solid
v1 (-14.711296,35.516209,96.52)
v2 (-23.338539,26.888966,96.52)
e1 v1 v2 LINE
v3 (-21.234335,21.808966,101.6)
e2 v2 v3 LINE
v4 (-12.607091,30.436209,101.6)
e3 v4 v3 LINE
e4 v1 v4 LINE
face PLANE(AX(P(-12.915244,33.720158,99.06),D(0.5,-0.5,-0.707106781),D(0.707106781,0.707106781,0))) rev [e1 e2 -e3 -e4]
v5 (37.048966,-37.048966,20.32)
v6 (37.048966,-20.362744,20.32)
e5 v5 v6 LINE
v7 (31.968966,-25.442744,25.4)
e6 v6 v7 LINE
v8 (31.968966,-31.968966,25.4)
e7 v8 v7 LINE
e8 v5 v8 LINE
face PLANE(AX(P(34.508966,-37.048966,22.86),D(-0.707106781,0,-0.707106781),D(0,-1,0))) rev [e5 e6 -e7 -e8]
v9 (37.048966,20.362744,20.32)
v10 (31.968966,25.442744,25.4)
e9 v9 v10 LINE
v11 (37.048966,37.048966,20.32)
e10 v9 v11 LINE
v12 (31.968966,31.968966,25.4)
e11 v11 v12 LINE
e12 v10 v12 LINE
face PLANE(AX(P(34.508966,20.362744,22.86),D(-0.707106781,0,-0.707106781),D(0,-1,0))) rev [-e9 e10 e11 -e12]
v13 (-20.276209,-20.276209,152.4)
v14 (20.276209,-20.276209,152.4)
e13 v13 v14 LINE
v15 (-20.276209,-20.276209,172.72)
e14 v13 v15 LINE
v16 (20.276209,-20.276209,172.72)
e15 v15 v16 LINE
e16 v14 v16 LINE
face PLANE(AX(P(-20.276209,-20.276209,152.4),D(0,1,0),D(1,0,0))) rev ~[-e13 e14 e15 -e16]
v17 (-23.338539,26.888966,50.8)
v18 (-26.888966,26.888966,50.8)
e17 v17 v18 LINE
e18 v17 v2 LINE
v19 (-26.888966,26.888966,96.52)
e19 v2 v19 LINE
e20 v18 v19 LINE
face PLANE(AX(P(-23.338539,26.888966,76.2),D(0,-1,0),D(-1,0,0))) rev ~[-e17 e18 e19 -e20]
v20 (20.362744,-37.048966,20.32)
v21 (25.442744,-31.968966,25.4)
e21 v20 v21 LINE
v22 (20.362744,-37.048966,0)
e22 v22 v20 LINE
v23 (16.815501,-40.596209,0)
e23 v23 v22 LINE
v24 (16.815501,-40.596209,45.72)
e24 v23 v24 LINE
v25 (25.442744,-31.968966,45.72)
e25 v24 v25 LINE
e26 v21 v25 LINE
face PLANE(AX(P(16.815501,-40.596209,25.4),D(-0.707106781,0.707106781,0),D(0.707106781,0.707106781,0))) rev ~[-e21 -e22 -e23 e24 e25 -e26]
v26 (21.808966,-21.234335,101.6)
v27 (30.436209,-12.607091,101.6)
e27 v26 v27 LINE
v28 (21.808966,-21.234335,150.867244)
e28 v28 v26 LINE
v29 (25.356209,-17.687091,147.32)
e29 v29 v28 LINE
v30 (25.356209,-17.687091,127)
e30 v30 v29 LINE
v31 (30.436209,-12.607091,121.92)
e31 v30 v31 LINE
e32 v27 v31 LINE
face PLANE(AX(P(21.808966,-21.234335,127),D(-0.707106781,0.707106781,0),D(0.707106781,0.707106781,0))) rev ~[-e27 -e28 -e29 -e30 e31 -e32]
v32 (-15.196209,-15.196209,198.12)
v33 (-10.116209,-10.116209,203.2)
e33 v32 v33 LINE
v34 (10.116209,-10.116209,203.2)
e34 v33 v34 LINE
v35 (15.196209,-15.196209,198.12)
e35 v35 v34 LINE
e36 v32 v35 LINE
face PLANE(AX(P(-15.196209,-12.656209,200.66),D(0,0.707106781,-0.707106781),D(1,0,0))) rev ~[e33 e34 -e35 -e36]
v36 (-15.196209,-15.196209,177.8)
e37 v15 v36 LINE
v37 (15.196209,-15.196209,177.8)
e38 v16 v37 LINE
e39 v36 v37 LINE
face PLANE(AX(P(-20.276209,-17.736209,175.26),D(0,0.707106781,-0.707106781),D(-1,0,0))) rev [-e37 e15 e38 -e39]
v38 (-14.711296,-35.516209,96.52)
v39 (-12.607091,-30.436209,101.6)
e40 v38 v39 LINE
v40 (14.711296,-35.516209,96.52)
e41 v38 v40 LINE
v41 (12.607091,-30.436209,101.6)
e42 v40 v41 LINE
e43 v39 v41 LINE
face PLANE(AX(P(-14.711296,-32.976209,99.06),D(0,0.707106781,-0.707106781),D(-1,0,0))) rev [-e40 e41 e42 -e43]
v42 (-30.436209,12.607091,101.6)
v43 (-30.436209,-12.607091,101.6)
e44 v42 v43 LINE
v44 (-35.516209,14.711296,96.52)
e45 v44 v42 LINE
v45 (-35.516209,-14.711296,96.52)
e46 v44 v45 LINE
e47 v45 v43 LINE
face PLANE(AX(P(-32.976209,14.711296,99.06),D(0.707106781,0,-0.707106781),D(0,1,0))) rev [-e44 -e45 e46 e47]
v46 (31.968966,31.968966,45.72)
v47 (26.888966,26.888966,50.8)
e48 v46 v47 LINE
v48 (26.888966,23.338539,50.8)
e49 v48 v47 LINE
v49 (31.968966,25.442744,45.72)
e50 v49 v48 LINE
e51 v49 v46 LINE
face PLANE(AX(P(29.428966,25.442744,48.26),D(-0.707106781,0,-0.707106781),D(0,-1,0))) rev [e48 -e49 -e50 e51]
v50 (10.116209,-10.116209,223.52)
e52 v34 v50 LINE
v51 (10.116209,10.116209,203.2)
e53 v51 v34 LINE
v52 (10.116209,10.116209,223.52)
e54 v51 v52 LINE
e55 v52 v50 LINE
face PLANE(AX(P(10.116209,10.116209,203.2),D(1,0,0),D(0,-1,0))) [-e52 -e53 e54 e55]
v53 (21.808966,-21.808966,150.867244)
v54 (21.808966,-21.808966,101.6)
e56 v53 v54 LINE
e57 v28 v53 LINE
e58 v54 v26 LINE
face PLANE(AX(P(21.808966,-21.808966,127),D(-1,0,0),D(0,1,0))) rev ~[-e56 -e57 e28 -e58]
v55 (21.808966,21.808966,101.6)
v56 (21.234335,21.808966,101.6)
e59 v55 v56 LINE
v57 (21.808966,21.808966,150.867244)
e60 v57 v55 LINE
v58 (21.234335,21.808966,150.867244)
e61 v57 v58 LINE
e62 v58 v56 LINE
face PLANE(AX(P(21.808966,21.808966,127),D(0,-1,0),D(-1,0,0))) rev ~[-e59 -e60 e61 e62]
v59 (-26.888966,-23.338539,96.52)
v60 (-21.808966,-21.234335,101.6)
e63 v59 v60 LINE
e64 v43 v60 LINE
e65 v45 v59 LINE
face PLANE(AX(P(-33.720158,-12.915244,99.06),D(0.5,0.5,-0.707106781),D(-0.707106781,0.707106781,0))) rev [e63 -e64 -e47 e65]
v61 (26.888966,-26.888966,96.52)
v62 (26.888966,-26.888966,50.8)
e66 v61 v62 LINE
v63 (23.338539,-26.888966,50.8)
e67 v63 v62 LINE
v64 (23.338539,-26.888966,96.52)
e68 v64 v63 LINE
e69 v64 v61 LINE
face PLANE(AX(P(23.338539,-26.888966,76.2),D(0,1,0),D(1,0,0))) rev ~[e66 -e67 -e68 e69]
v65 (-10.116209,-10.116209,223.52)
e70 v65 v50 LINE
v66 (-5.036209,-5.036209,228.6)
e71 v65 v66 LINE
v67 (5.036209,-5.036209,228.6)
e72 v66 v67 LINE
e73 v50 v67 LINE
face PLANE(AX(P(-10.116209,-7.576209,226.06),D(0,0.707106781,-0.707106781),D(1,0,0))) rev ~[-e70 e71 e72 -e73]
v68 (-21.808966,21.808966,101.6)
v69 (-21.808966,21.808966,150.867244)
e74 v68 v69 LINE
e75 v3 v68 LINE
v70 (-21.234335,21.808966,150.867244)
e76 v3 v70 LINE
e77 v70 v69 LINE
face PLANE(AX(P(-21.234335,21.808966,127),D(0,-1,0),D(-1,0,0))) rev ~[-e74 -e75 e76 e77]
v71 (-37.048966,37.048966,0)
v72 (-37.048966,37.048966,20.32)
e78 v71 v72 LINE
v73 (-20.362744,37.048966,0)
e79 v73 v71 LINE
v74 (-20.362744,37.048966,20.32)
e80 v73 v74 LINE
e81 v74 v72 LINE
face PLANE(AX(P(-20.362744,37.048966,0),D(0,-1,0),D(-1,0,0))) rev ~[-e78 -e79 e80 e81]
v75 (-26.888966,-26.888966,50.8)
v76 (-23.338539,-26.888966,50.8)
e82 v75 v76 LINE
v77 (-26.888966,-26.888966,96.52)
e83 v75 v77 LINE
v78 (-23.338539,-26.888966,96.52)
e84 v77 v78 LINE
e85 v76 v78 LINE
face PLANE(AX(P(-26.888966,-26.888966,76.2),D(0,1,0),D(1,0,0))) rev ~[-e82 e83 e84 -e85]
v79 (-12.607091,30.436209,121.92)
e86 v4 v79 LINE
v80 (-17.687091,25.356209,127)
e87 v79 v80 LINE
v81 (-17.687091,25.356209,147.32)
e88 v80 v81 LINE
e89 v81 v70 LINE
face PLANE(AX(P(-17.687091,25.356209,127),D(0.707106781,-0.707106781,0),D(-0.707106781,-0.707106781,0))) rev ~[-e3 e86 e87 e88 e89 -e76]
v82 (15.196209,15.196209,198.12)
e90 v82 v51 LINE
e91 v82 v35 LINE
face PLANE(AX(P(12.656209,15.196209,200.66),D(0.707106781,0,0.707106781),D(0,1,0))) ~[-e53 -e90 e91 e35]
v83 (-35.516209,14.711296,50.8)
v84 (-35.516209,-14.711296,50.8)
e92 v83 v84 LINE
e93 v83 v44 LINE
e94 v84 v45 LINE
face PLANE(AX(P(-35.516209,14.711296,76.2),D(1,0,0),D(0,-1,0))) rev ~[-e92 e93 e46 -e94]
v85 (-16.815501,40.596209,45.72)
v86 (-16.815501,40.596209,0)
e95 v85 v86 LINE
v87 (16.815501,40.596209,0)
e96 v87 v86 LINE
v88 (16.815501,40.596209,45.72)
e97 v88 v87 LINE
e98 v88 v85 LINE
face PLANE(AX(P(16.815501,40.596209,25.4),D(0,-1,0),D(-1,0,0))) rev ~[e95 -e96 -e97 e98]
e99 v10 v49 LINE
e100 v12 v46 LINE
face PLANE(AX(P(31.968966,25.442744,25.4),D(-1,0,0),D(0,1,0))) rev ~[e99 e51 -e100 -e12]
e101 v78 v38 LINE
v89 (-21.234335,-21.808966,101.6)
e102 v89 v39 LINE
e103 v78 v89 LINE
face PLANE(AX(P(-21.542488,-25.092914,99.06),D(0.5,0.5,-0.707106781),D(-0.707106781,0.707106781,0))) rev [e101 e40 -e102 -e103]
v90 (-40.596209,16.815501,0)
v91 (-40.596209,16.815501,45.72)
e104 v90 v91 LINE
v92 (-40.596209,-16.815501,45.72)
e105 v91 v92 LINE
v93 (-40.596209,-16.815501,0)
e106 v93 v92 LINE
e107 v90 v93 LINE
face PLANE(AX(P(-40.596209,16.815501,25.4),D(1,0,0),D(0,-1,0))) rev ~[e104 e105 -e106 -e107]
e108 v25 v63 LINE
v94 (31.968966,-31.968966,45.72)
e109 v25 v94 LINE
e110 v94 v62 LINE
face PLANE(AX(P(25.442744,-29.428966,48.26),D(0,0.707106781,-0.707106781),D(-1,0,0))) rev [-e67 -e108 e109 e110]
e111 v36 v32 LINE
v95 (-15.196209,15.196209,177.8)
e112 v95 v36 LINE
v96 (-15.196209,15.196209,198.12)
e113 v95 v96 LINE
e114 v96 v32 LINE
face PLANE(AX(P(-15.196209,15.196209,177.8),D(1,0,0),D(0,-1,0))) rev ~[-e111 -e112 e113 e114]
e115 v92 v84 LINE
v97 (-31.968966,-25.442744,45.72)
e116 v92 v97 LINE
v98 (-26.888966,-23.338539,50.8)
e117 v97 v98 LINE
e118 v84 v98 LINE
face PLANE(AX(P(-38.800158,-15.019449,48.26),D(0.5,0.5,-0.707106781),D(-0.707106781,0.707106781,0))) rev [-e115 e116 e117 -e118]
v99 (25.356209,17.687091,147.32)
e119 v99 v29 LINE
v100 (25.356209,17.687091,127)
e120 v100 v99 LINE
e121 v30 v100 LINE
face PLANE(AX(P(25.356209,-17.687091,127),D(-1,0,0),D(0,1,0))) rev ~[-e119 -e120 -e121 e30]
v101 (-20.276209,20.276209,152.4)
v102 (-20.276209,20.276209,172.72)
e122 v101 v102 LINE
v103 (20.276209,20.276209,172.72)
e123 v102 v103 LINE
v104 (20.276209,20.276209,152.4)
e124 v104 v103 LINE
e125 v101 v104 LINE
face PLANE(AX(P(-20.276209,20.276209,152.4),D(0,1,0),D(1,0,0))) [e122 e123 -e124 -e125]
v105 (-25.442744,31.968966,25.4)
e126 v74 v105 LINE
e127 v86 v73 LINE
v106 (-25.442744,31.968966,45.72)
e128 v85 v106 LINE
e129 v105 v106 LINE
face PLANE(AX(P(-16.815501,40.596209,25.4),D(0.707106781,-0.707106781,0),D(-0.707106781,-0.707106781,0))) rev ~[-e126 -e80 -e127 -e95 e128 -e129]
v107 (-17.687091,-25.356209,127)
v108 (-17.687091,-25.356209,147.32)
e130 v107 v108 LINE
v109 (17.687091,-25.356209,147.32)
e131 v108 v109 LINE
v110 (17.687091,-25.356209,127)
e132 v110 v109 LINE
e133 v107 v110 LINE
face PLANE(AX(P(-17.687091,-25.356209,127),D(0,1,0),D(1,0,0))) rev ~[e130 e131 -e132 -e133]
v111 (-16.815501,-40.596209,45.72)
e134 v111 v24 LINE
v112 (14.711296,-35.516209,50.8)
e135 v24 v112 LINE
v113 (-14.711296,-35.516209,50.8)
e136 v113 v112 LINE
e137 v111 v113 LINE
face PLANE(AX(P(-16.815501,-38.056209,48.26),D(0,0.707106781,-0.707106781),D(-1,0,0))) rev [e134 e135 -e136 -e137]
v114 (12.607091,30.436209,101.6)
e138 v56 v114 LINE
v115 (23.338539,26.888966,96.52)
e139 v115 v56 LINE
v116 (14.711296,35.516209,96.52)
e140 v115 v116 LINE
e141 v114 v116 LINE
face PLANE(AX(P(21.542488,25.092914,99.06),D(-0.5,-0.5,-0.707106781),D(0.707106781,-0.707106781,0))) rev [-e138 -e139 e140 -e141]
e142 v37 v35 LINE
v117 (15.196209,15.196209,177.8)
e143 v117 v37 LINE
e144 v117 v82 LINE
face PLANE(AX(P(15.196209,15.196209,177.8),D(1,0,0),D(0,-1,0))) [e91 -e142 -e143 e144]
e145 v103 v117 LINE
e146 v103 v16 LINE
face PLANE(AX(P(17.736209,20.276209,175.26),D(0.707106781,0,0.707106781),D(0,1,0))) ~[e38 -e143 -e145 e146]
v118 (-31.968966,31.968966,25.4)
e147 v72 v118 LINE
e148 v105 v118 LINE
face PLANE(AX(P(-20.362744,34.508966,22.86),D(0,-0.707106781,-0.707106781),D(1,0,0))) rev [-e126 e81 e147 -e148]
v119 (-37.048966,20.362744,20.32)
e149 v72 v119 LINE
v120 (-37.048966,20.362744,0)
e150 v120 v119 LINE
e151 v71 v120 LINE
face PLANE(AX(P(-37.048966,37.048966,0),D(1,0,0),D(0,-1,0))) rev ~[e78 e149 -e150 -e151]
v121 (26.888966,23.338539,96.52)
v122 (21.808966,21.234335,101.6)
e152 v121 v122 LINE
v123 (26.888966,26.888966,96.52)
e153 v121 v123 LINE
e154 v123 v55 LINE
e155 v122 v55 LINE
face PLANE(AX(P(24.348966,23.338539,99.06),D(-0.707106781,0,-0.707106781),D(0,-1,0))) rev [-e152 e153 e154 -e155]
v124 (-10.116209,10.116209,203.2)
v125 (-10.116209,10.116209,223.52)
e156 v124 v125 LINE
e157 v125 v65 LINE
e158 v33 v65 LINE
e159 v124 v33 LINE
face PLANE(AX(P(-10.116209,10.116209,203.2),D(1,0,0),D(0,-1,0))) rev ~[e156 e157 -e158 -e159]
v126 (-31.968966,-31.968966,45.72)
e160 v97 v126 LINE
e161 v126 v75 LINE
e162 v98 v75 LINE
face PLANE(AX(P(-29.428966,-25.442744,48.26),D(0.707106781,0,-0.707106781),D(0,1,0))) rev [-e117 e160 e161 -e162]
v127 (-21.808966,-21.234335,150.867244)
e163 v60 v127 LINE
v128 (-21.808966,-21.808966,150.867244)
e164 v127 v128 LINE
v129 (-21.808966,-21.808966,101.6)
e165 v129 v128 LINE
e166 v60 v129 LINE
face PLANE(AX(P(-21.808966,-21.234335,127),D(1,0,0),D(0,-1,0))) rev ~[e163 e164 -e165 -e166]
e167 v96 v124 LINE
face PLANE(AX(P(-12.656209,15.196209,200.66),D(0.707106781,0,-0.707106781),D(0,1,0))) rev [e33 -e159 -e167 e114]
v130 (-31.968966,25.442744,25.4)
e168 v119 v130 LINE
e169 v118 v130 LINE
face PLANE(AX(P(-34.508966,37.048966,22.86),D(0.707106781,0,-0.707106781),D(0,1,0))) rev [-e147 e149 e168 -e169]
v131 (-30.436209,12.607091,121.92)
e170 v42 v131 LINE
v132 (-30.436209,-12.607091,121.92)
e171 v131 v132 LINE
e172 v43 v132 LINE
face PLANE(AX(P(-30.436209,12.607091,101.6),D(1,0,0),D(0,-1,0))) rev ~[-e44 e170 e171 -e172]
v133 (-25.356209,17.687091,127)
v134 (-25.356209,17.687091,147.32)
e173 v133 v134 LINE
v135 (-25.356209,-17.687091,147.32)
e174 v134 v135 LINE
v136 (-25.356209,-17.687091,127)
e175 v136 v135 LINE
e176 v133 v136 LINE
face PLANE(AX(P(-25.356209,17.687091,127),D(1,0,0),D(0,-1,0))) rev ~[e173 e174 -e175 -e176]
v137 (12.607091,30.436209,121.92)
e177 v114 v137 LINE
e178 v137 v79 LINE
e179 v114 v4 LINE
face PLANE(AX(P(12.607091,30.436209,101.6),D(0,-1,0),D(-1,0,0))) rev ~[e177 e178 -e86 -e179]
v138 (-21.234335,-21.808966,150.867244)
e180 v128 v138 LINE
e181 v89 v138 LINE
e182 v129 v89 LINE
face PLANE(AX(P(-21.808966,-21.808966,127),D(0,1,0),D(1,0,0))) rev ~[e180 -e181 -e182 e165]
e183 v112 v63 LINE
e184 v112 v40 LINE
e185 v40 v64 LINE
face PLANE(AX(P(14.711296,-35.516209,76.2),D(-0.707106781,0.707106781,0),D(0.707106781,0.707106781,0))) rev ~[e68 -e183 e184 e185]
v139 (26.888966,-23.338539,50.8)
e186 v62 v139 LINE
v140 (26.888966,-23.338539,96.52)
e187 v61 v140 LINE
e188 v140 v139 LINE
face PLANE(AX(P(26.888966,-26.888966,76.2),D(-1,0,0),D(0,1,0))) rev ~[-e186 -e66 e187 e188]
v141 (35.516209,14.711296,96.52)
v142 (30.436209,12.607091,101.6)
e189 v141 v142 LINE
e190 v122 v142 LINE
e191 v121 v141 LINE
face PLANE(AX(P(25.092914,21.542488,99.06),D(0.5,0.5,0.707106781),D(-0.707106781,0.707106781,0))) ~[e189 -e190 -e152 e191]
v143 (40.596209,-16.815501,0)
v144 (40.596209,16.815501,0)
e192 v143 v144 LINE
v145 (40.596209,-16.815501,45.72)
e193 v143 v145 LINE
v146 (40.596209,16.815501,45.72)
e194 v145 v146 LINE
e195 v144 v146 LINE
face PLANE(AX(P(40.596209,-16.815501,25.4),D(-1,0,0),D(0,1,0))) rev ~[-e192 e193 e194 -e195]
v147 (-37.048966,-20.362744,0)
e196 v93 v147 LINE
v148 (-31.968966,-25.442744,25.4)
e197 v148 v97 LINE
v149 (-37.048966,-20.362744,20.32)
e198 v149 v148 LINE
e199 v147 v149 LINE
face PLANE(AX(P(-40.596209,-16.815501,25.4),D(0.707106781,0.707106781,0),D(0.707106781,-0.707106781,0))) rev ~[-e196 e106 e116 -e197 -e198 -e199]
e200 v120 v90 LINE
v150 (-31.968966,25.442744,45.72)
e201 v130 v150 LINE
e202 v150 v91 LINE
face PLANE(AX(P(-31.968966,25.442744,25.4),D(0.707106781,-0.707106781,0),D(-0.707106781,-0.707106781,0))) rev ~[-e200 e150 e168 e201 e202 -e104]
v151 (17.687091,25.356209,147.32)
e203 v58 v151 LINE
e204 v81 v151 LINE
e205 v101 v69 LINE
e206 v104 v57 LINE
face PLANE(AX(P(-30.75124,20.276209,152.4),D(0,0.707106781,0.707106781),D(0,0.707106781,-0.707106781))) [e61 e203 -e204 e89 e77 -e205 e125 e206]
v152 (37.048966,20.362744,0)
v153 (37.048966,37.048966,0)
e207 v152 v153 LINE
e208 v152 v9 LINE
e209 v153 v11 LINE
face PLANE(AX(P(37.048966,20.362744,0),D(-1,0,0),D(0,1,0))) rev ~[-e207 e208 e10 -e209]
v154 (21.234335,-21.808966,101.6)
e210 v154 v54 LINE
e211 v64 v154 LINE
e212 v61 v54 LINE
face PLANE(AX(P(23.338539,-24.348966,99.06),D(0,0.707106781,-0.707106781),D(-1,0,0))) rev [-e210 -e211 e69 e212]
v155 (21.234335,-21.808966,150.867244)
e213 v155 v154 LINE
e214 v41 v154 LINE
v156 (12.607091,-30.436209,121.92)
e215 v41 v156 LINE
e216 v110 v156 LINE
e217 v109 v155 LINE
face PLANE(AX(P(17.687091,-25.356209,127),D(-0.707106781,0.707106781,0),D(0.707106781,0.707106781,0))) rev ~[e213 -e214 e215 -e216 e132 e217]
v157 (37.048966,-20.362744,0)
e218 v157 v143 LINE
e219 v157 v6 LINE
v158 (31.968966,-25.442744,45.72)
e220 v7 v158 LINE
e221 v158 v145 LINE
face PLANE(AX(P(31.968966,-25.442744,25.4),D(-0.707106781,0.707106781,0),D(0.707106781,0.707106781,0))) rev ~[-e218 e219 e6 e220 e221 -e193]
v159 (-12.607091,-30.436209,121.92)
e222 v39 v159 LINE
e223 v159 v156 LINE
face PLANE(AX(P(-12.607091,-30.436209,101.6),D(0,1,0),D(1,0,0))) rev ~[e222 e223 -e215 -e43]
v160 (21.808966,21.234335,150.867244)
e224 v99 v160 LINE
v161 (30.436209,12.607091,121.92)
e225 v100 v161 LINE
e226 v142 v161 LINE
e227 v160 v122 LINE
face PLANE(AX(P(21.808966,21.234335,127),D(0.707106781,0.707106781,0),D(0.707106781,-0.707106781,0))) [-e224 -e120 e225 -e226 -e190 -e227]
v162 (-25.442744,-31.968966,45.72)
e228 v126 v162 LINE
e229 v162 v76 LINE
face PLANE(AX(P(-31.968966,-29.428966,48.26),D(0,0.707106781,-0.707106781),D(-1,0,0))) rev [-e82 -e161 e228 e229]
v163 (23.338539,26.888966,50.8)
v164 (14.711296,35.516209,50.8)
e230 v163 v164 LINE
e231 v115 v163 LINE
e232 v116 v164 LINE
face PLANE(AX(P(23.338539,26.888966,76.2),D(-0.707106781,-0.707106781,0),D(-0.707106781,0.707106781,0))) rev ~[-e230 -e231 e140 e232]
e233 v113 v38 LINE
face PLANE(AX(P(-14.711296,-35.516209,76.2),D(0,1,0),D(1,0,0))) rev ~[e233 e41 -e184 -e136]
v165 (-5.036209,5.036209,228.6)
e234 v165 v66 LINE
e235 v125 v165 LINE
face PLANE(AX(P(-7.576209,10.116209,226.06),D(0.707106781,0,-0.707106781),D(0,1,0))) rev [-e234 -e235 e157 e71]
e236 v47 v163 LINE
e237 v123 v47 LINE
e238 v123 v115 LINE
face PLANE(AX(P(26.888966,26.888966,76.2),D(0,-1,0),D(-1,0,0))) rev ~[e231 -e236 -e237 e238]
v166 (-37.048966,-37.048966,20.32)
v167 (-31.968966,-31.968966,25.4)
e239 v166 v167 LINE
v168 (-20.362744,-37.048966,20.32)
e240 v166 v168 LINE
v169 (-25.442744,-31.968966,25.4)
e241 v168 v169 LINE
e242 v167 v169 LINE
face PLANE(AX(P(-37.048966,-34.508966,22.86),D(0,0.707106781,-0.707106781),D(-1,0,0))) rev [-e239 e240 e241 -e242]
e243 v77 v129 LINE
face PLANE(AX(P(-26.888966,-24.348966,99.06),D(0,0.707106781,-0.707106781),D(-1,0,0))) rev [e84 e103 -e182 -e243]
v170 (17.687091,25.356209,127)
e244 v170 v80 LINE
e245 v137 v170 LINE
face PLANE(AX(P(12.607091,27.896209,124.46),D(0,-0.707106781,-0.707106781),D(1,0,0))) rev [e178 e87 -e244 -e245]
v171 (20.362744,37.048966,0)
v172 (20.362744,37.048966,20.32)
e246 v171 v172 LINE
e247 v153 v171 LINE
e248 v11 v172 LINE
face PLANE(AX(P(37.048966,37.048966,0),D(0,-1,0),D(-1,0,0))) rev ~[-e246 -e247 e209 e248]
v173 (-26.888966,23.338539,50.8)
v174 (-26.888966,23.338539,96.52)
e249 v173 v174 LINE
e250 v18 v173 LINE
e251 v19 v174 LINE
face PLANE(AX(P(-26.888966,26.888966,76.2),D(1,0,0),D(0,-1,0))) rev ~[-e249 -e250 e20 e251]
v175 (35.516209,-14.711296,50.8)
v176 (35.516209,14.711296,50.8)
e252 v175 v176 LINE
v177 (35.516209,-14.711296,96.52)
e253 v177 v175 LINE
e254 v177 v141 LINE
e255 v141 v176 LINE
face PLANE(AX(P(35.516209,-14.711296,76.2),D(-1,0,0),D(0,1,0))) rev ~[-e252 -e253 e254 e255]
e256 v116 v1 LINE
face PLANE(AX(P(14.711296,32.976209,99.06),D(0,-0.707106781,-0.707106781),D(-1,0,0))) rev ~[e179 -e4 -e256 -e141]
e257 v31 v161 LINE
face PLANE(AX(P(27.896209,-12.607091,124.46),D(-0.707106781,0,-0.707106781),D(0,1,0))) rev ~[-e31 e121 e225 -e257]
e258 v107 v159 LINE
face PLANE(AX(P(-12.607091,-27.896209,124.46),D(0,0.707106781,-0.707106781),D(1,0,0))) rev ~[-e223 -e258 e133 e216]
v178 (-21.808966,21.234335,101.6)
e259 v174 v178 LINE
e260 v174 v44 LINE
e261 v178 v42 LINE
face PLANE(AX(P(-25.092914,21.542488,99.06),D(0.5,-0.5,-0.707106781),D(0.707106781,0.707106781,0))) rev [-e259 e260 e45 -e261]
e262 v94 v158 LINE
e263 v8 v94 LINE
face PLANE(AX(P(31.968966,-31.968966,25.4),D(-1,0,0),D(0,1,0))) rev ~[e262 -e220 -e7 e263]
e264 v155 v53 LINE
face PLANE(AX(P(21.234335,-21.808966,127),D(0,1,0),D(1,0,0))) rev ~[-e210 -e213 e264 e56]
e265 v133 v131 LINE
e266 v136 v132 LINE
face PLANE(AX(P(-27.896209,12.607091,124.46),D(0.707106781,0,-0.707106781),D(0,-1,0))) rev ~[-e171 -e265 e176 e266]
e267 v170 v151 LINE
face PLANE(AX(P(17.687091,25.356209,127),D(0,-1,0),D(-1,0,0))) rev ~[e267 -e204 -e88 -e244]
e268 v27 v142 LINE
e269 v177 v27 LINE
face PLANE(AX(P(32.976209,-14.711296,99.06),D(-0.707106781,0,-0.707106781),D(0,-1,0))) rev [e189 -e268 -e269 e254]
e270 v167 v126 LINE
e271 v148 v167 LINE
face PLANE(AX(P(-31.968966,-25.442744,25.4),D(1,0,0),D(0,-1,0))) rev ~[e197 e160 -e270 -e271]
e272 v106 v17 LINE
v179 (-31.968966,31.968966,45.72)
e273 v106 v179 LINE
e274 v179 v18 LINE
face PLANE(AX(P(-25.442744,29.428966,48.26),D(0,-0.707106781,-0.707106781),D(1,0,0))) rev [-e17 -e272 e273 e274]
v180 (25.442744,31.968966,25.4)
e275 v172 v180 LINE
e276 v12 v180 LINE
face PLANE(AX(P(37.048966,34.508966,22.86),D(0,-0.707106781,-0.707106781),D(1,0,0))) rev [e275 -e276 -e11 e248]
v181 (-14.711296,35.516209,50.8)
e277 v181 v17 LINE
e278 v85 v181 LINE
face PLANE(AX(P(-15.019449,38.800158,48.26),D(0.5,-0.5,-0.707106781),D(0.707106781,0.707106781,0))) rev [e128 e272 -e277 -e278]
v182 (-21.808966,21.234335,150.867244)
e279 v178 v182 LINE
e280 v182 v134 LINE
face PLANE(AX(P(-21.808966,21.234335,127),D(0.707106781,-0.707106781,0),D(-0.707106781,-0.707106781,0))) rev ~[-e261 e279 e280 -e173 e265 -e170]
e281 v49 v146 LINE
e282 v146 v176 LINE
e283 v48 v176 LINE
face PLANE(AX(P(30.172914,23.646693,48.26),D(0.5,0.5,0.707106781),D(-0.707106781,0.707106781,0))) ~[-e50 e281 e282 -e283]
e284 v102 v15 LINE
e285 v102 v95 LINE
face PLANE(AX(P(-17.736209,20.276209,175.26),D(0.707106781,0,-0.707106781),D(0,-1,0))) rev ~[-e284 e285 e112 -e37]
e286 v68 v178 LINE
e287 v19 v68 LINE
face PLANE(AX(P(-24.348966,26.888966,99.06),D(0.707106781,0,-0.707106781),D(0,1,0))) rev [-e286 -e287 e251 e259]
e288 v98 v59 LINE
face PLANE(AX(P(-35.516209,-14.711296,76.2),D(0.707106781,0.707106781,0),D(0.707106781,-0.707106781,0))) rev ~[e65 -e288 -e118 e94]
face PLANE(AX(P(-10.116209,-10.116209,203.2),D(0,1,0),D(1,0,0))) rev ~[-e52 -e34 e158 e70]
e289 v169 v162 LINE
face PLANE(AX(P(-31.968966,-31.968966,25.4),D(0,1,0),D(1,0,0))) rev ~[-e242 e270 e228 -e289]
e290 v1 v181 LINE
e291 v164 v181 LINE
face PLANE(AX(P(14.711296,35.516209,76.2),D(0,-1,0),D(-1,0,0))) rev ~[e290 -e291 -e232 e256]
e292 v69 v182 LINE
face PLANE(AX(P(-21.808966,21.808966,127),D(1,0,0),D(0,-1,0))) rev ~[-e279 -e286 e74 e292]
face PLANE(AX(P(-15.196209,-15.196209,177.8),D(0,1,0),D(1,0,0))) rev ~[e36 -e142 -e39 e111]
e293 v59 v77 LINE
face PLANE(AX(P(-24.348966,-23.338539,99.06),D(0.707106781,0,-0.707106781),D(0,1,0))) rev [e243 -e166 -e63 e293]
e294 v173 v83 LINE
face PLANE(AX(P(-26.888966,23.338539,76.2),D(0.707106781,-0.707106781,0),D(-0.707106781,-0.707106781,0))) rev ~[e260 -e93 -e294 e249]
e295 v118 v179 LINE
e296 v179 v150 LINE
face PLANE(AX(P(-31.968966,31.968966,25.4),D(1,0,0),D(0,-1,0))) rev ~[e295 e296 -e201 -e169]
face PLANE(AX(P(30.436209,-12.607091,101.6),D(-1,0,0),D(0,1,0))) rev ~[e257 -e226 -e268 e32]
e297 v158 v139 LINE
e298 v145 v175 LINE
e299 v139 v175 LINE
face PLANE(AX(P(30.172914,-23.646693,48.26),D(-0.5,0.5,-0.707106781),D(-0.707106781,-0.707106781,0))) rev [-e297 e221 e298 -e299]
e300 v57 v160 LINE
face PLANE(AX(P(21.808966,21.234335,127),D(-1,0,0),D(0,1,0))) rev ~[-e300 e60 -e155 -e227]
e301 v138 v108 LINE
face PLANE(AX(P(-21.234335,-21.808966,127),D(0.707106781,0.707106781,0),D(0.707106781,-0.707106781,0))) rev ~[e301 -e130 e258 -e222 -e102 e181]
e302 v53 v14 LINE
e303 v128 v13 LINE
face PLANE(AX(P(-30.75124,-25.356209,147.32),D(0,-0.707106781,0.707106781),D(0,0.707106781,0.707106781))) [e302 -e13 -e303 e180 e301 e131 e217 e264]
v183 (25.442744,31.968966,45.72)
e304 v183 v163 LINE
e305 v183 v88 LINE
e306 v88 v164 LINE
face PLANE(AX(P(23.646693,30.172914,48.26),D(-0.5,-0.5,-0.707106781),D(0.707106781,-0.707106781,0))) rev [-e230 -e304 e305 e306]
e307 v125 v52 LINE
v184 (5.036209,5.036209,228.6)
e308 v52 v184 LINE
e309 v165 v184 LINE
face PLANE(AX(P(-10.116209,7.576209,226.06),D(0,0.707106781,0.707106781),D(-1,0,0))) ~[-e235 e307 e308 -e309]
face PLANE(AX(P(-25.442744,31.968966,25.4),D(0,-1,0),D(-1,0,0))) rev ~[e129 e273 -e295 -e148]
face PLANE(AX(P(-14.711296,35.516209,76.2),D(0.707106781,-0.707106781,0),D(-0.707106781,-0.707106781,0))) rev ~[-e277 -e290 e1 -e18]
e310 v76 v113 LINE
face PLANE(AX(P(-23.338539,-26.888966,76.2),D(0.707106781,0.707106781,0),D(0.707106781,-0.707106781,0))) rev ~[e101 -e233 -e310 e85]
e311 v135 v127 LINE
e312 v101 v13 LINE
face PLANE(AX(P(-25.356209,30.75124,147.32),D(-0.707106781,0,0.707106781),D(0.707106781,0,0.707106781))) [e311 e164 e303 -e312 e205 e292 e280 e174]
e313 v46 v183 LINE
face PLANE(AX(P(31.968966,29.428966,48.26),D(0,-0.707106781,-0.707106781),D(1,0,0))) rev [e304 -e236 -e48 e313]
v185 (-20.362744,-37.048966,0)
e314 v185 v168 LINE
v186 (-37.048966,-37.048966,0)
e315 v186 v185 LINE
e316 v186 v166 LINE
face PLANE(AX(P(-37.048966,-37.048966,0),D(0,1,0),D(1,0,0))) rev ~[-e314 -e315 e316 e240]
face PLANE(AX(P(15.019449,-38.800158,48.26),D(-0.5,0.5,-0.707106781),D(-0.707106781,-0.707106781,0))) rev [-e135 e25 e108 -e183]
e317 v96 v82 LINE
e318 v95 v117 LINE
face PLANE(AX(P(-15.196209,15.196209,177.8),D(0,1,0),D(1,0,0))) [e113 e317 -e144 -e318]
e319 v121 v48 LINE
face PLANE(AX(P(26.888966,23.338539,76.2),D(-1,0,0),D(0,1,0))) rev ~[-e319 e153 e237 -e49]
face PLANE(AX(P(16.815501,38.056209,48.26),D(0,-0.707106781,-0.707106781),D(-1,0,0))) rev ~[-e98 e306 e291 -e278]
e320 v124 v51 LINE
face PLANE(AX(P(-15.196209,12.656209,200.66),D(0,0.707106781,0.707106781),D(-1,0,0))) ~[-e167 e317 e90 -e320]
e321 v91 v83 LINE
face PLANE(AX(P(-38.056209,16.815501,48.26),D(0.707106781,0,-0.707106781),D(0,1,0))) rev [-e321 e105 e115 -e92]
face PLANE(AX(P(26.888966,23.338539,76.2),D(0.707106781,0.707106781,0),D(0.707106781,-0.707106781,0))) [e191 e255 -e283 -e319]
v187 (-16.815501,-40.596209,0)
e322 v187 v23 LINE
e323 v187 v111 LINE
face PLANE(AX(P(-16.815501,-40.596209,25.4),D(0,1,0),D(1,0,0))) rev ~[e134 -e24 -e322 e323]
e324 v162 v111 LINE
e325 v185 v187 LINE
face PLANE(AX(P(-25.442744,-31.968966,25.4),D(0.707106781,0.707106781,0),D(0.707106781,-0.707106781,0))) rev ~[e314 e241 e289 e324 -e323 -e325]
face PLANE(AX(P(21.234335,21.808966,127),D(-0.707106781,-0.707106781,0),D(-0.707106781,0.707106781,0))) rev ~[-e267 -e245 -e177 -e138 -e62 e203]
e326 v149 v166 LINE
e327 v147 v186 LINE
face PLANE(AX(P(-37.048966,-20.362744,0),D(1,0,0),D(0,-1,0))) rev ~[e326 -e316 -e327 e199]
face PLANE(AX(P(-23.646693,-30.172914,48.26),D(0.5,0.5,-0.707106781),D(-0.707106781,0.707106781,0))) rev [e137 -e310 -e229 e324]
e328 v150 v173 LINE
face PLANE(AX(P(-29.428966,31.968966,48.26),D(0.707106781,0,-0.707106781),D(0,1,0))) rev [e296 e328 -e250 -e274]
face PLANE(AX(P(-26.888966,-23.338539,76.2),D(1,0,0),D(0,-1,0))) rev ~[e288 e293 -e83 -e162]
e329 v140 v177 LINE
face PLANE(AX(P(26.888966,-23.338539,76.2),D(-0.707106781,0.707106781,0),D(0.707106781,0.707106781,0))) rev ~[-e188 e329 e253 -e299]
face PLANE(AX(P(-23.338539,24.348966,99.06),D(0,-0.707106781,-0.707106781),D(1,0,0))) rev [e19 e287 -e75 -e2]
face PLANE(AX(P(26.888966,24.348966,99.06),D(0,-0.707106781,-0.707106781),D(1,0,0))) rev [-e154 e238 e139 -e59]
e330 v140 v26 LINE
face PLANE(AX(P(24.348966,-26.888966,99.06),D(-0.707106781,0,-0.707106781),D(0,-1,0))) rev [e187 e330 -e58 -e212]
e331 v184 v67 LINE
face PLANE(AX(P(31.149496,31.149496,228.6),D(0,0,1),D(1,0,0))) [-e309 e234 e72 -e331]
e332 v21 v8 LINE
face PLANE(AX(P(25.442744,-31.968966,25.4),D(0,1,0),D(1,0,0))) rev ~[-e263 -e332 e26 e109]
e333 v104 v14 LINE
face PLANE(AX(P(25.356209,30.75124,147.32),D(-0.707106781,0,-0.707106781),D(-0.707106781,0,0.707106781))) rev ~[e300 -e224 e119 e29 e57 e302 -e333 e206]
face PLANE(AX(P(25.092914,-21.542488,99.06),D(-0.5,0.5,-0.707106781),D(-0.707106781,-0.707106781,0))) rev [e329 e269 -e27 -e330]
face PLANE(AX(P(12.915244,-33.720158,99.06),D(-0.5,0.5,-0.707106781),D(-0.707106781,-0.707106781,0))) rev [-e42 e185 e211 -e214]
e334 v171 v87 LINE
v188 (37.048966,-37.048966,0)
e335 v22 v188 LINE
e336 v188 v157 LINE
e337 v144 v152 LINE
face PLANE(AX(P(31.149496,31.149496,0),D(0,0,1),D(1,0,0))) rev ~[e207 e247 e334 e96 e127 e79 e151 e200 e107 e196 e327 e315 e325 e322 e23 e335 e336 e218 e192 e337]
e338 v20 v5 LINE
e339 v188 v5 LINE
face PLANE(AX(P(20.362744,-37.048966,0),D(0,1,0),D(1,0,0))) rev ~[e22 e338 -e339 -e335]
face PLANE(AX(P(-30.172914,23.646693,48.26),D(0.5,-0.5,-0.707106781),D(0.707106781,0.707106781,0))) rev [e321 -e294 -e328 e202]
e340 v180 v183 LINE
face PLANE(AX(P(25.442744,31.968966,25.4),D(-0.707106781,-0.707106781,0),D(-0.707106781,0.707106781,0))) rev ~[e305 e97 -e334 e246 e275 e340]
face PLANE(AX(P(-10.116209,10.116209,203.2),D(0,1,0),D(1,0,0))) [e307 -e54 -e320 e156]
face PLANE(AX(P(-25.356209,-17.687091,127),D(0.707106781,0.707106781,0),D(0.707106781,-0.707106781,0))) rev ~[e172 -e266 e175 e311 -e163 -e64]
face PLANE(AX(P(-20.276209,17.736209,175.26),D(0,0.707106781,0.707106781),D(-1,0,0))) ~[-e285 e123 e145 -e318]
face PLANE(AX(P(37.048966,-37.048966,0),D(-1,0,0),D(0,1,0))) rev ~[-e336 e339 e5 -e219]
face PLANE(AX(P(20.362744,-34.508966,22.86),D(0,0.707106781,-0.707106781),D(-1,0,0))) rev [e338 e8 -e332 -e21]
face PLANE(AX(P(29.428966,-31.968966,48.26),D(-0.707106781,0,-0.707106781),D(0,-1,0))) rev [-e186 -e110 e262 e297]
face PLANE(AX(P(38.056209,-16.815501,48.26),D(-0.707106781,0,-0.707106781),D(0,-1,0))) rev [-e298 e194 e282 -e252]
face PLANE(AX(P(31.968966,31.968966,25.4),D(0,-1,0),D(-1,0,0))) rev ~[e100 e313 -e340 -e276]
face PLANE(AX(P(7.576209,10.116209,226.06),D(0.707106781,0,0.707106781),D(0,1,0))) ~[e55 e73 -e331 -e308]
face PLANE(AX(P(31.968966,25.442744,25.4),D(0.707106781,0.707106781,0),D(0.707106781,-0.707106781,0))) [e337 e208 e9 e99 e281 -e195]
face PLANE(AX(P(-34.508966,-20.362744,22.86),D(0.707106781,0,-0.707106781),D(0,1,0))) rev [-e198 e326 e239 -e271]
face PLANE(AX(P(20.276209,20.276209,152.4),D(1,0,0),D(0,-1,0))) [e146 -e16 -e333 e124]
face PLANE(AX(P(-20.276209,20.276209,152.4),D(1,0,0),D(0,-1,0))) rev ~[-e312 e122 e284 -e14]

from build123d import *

# Parameters (mm, degrees)
F1_DEPTH     = 25.4
F2_SIZE      = 5.08
F3_DEPTH     = 25.4
F4_SIZE      = 5.08
F5_DEPTH     = 25.4
F6_DEPTH     = 25.4
F7_SIZE      = 5.08
F8_DEPTH     = 25.4
F9_SIZE      = 5.08
F10_DEPTH    = 25.4
F11_T1_DEPTH = 61.5024806542
F11_T3_DEPTH = 61.5024806542
F12_DEPTH    = 25.4
F13_SIZE     = 5.08
F14_DEPTH    = 25.4
F15_SIZE     = 5.08
F16_DEPTH    = 25.4
F17_SIZE     = 5.08


# Not quite as in the source:
# - a fillet or chamfer that OpenCascade refuses, or shapes differently, is made with other operations: its cross-section is extruded or revolved along the edge and cut away or added


with BuildPart() as f1:
    # F0 (on Top) → F1 (new body)
    with BuildSketch(Plane.XY):
        Polygon((37.0489656925, 20.3627443159), (37.0489656925, 37.0489656925), (20.3627443159, 37.0489656925), align=None)
        Polygon((40.5962094665, 16.8155005419), (37.0489656925, 20.3627443159), (37.0489656925, -20.3627443159), (40.5962094665, -16.8155005419), align=None)
        Polygon((37.0489656925, -20.3627443159), (37.0489656925, 20.3627443159), (20.3627443159, 37.0489656925), (-20.3627443159, 37.0489656925), (-37.0489656925, 20.3627443159), (-37.0489656925, -20.3627443159), (-20.3627443159, -37.0489656925), (20.3627443159, -37.0489656925), align=None)
        Polygon((-20.3627443159, 37.0489656925), (20.3627443159, 37.0489656925), (16.8155005419, 40.5962094665), (-16.8155005419, 40.5962094665), align=None)
        Polygon((37.0489656925, -37.0489656925), (37.0489656925, -20.3627443159), (20.3627443159, -37.0489656925), align=None)
        Polygon((-37.0489656925, 20.3627443159), (-20.3627443159, 37.0489656925), (-37.0489656925, 37.0489656925), align=None)
        Polygon((16.8155005419, -40.5962094665), (20.3627443159, -37.0489656925), (-20.3627443159, -37.0489656925), (-16.8155005419, -40.5962094665), align=None)
        Polygon((-37.0489656925, -20.3627443159), (-37.0489656925, 20.3627443159), (-40.5962094665, 16.8155005419), (-40.5962094665, -16.8155005419), align=None)
        Polygon((-37.0489656925, -37.0489656925), (-20.3627443159, -37.0489656925), (-37.0489656925, -20.3627443159), align=None)
    extrude(amount=F1_DEPTH)

    # F2
    f2_edges = [f1.edges().sort_by_distance(p)[0] for p in [
        (-28.705855, 37.048966, 25.4),
        (-37.048966, 28.705855, 25.4),
        (28.705855, 37.048966, 25.4),
        (37.048966, 28.705855, 25.4),
        (37.048966, -28.705855, 25.4),
        (28.705855, -37.048966, 25.4),
        (-28.705855, -37.048966, 25.4),
        (-37.048966, -28.705855, 25.4),
    ]]
    chamfer(f2_edges, length=F2_SIZE)

    # F3 (add): a face of the model
    f3_faces = [f1.faces().sort_by_distance(p)[0] for p in [
        (0, 0, 25.4),
    ]]
    extrude(f3_faces, amount=F3_DEPTH)

    # F4
    f4_edges = [f1.edges().sort_by_distance(p)[0] for p in [
        (-21.129122, 36.282588, 50.8),
        (-28.705855, 31.968966, 50.8),
        (-31.968966, 28.705855, 50.8),
        (-36.282588, 21.129122, 50.8),
        (-40.596209, 0, 50.8),
        (-36.282588, -21.129122, 50.8),
        (-31.968966, -28.705855, 50.8),
        (-28.705855, -31.968966, 50.8),
        (-21.129122, -36.282588, 50.8),
        (0, -40.596209, 50.8),
        (21.129122, -36.282588, 50.8),
        (28.705855, -31.968966, 50.8),
        (31.968966, -28.705855, 50.8),
        (36.282588, -21.129122, 50.8),
        (40.596209, 0, 50.8),
        (36.282588, 21.129122, 50.8),
        (31.968966, 28.705855, 50.8),
        (28.705855, 31.968966, 50.8),
        (21.129122, 36.282588, 50.8),
        (0, 40.596209, 50.8),
    ]]
    chamfer(f4_edges, length=F4_SIZE)

    # F5 (add): a face of the model
    f5_faces = [f1.faces().sort_by_distance(p)[0] for p in [
        (0, 0, 50.8),
    ]]
    extrude(f5_faces, amount=F5_DEPTH)

    # F6 (add): a face of the model
    f6_faces = [f1.faces().sort_by_distance(p)[0] for p in [
        (0, 0, 76.2),
    ]]
    extrude(f6_faces, amount=F6_DEPTH)

    # F7
    f7_edges = [f1.edges().sort_by_distance(p)[0] for p in [
        (-19.024918, 31.202588, 101.6),
        (-25.113753, 26.888966, 101.6),
        (0, 35.516209, 101.6),
        (-26.888966, 25.113753, 101.6),
        (19.024918, 31.202588, 101.6),
        (-31.202588, 19.024918, 101.6),
        (25.113753, 26.888966, 101.6),
        (-35.516209, 0, 101.6),
        (26.888966, 25.113753, 101.6),
        (-31.202588, -19.024918, 101.6),
        (31.202588, 19.024918, 101.6),
        (-26.888966, -25.113753, 101.6),
        (35.516209, 0, 101.6),
        (-25.113753, -26.888966, 101.6),
        (31.202588, -19.024918, 101.6),
        (-19.024918, -31.202588, 101.6),
        (26.888966, -25.113753, 101.6),
        (0, -35.516209, 101.6),
        (25.113753, -26.888966, 101.6),
        (19.024918, -31.202588, 101.6),
    ]]
    chamfer(f7_edges, length=F7_SIZE)

    # F8 (add): a face of the model
    f8_faces = [f1.faces().sort_by_distance(p)[0] for p in [
        (0, 0, 101.6),
    ]]
    extrude(f8_faces, amount=F8_DEPTH)

    # F9
    f9_edges = [f1.edges().sort_by_distance(p)[0] for p in [
        (0, 30.436209, 127),
        (-30.436209, 0, 127),
        (30.436209, 0, 127),
        (0, -30.436209, 127),
    ]]
    chamfer(f9_edges, length=F9_SIZE)

    # F10 (add): a face of the model
    f10_faces = [f1.faces().sort_by_distance(p)[0] for p in [
        (0, 0, 127),
    ]]
    extrude(f10_faces, amount=F10_DEPTH)

    # F11: chamfer of 5.08 on 4 edges, made by hand

    # F11_s2 → F11_t1 (cut)
    with BuildSketch(Plane.XZ.offset(-30.7512403271)):
        Polygon((-25.3562094665, 147.32), (-20.2762094665, 152.4), (-25.3562094665, 152.4), align=None)
        Polygon((25.3562094665, 147.32), (20.2762094665, 152.4), (25.3562094665, 152.4), align=None)
    extrude(amount=F11_T1_DEPTH, mode=Mode.SUBTRACT)

    # F11_s4 → F11_t3 (cut)
    with BuildSketch(Plane.YZ.offset(-30.7512403271)):
        Polygon((-25.3562094665, 147.32), (-20.2762094665, 152.4), (-25.3562094665, 152.4), align=None)
        Polygon((20.2762094665, 152.4), (25.3562094665, 147.32), (25.3562094665, 152.4), align=None)
    extrude(amount=F11_T3_DEPTH, mode=Mode.SUBTRACT)

    # F12 (add): a face of the model
    f12_faces = [f1.faces().sort_by_distance(p)[0] for p in [
        (0, 0, 152.4),
    ]]
    extrude(f12_faces, amount=F12_DEPTH)

    # F13
    f13_edges = [f1.edges().sort_by_distance(p)[0] for p in [
        (0, 20.276209, 177.8),
        (20.276209, 0, 177.8),
        (0, -20.276209, 177.8),
        (-20.276209, 0, 177.8),
    ]]
    chamfer(f13_edges, length=F13_SIZE)

    # F14 (add): a face of the model
    f14_faces = [f1.faces().sort_by_distance(p)[0] for p in [
        (0, 0, 177.8),
    ]]
    extrude(f14_faces, amount=F14_DEPTH)

    # F15
    f15_edges = [f1.edges().sort_by_distance(p)[0] for p in [
        (0, 15.196209, 203.2),
        (-15.196209, 0, 203.2),
        (15.196209, 0, 203.2),
        (0, -15.196209, 203.2),
    ]]
    chamfer(f15_edges, length=F15_SIZE)

    # F16 (add): a face of the model
    f16_faces = [f1.faces().sort_by_distance(p)[0] for p in [
        (0, 0, 203.2),
    ]]
    extrude(f16_faces, amount=F16_DEPTH)

    # F17
    f17_edges = [f1.edges().sort_by_distance(p)[0] for p in [
        (0, 10.116209, 228.6),
        (-10.116209, 0, 228.6),
        (10.116209, 0, 228.6),
        (0, -10.116209, 228.6),
    ]]
    chamfer(f17_edges, length=F17_SIZE)


solid = f1.part
